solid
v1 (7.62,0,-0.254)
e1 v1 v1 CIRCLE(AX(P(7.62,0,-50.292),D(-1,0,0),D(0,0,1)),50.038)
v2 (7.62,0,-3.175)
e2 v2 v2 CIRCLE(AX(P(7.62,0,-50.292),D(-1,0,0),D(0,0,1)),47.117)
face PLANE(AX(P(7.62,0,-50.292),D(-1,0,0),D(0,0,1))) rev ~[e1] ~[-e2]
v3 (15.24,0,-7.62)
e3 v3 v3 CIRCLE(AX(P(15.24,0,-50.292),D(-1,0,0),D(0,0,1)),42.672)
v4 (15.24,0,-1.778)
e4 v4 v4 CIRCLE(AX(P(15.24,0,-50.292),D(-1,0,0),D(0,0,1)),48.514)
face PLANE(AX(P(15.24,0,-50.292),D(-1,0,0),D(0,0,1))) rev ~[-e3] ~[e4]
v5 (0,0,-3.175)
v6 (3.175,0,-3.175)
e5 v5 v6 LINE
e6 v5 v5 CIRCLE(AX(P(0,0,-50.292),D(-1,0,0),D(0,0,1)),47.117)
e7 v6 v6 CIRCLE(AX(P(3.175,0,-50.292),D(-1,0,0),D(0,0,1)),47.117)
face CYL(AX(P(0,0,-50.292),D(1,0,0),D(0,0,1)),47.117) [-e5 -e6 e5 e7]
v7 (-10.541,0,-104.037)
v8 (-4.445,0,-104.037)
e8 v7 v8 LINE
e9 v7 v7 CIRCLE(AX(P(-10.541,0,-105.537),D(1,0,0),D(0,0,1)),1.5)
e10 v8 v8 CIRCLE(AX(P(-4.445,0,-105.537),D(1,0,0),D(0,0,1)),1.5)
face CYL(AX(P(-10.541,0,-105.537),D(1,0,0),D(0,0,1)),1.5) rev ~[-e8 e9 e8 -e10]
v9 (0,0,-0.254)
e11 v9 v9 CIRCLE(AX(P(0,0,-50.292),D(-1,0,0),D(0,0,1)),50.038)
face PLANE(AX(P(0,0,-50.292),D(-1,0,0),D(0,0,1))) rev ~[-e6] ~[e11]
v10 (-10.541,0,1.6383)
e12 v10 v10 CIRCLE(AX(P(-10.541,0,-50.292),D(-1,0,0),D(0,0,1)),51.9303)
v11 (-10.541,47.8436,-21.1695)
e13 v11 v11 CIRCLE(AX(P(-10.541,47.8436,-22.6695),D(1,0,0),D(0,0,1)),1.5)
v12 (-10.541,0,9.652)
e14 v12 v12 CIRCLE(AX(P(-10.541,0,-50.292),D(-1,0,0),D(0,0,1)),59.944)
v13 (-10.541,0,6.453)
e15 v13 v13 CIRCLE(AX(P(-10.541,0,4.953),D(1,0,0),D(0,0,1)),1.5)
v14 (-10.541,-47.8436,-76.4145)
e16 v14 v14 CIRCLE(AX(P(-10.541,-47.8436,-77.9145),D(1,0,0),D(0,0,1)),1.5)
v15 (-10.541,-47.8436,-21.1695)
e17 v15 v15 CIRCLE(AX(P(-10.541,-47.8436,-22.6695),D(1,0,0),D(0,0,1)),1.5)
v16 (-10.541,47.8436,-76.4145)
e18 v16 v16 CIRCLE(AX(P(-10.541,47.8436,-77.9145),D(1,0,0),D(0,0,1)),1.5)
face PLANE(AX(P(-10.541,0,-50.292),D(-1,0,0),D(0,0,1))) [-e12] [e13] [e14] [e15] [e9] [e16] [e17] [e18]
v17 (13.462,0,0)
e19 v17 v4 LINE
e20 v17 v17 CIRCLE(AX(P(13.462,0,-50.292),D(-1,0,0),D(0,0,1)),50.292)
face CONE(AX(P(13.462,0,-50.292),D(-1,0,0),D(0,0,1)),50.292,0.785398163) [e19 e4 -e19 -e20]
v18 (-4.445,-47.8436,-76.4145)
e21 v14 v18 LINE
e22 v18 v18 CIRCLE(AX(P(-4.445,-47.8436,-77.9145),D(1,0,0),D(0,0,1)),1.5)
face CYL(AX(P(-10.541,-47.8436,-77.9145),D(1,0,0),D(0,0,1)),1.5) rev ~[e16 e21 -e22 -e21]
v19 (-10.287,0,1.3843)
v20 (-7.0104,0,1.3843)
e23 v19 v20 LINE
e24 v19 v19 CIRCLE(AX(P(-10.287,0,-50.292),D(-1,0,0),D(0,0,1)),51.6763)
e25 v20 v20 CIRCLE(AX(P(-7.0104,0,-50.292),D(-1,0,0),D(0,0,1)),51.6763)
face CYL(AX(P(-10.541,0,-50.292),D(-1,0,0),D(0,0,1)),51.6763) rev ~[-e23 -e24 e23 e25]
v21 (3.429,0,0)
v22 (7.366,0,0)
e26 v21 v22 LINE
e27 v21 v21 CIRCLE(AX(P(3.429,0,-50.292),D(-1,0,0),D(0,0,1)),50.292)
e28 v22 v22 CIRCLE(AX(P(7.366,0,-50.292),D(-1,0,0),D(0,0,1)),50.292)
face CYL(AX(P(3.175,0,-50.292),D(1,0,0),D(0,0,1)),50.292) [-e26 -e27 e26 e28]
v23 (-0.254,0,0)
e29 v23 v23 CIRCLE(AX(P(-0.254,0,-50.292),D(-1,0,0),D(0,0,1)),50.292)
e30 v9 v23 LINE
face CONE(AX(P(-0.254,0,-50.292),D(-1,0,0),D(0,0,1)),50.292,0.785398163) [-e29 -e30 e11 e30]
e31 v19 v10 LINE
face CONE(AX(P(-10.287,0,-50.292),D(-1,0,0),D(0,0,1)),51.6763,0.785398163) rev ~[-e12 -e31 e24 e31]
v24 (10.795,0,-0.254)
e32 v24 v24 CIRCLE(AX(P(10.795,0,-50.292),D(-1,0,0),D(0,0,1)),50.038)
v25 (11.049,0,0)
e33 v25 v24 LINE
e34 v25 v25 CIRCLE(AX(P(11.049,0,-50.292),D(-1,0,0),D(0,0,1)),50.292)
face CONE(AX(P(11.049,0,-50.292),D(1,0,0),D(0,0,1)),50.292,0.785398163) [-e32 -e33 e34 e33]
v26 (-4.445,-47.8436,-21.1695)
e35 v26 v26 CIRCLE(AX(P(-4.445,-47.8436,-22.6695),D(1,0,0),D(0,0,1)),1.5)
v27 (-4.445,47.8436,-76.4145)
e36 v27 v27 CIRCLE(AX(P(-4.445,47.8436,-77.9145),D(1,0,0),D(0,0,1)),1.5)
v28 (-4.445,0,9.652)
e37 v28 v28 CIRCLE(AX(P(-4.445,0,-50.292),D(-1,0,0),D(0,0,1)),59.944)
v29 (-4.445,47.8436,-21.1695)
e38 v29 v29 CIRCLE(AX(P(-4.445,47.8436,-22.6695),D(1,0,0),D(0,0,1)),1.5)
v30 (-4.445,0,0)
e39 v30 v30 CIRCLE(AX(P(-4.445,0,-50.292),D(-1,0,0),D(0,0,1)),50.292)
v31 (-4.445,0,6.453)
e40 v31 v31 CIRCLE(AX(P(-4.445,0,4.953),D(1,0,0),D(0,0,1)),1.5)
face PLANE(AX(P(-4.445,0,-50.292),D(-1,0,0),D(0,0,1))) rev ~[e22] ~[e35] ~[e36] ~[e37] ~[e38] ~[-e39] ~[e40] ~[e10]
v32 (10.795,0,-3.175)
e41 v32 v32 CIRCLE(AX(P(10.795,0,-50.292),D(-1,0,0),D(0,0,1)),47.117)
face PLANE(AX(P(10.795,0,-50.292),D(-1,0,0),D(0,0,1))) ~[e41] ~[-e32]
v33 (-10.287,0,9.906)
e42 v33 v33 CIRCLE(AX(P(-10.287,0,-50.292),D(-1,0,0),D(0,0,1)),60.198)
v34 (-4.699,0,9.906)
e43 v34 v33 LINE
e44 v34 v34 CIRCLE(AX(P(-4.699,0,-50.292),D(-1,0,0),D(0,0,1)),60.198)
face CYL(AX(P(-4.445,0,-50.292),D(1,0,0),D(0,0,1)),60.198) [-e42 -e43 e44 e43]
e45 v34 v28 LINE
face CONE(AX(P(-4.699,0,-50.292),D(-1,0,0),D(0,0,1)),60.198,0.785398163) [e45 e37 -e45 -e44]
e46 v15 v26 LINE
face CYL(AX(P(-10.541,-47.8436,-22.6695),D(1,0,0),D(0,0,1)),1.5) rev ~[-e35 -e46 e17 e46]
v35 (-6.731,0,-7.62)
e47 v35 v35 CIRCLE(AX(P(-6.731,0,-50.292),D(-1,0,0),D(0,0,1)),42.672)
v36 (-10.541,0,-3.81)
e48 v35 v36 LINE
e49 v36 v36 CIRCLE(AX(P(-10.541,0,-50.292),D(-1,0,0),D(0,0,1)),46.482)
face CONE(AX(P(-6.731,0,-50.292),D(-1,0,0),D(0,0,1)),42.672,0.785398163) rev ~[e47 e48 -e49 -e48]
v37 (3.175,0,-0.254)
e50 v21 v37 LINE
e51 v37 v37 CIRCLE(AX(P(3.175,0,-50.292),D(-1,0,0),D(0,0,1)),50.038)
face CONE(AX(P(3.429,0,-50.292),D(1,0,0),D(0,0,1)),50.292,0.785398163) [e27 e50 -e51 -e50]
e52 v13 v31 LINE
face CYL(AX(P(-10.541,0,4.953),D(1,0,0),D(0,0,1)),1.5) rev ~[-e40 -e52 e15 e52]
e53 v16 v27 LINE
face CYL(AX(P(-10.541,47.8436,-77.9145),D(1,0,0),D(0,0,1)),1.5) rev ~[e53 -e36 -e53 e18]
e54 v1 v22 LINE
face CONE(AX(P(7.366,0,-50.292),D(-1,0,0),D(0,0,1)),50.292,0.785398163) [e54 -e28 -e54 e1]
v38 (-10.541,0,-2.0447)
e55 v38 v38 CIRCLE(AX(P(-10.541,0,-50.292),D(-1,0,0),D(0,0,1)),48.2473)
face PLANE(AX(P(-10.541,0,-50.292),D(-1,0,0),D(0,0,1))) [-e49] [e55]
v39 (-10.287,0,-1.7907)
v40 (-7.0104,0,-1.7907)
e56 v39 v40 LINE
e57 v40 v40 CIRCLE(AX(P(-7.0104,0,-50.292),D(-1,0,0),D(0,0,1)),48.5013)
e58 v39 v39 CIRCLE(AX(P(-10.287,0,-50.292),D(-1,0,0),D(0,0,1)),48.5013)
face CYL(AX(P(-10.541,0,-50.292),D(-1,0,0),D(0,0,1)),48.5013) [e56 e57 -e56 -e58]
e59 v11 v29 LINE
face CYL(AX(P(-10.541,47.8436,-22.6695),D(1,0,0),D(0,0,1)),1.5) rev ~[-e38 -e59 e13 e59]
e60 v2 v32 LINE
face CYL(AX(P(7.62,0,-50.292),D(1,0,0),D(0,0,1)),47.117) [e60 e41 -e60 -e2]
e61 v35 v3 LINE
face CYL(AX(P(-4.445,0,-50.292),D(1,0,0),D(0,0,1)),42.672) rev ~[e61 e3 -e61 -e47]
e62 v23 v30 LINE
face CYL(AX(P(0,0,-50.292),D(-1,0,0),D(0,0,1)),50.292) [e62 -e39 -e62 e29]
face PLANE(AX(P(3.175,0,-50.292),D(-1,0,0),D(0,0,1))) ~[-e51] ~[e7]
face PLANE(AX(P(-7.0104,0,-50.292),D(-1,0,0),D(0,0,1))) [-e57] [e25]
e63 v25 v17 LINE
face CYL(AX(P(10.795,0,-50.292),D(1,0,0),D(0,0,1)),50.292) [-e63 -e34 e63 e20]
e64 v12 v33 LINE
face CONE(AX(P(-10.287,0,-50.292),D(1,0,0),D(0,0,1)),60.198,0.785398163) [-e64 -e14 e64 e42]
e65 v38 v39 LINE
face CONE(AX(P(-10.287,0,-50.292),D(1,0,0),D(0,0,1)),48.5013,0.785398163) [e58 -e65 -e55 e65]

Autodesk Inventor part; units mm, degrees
ref_plane "YZ Plane" through (0, 0, 0) normal (1, 0, 0) x (0, 1, 0)
ref_plane "XZ Plane" through (0, 0, 0) normal (0, 1, 0) x (-1, 0, 0)
ref_plane "XY Plane" through (0, 0, 0) normal (0, 0, 1) x (1, 0, 0)
sketch "Sketch1" plane through (0, 0, 0) normal (0, 1, 0) x (-1, 0, 0)
  line L0 (0, 0) -> (4.445, 0)
  line L1 (0, 0) -> (0, -3.175)
  line L2 (0, -3.175) -> (-3.175, -3.175)
  line L3 (-3.175, -3.175) -> (-3.175, 0)
  line L4 (-3.175, 0) -> (-7.62, 0)
  line L5 (-7.62, 0) -> (-7.62, -3.175)
  line L6 (-7.62, -3.175) -> (-10.795, -3.175)
  line L7 (-10.795, -3.175) -> (-10.795, 0)
  line L8 (-10.795, 0) -> (-15.24, 0)
  line L9 (-15.24, 0) -> (-15.24, -7.62)
  line L10 (-15.24, -7.62) -> (4.445, -7.62)
  line L11 (4.445, -7.62) -> (4.445, 0)
  line L12 (-15.24, 0) -> (-15.24, -50.292) construction
  line L13 (-15.24, -50.292) -> (-2.54, -50.292) construction
  dimension "d0" = 4.445
  dimension "d1" = 3.175
  dimension "d2" = 3.175
  dimension "d3" = 4.445
  dimension "d4" = 3.175
  dimension "d5" = 4.445
  dimension "d6" = 7.62
  dimension "d7" = 50.292
  dimension "d38" = 12.7
revolve "Revolution1" add sketch "Sketch1" angle 360 about axis through (15.24, 0, -50.292) along (-1, 0, 0)
sketch "Sketch2" plane through (-4.445, 0, -50.292) normal (-1, 0, 0) x (0, 0, 1)
  circle A0 centre (0, 0) radius 60.198
  circle A1 centre (0, 0) radius 42.672 projected
  dimension "d10" = 120.396
extrude "Extrusion1" add sketch "Sketch2" along normal blind 6.096
sketch "Sketch3" plane through (-10.541, 0, -50.292) normal (-1, 0, 0) x (0, 0, 1)
  circle A0 centre (0, 0) radius 48.5013
  circle A1 centre (0, 0) radius 51.6763
  circle A2 centre (0, 0) radius 42.672 construction
  dimension "d42" = 3.175
  dimension "d62" = 97.0026
extrude "Extrusion2" cut sketch "Sketch3" against normal blind 3.5306
chamfer "Chamfer1" distance 1.778 angle 45 1 edges at (15.24, 0, -100.584)
sketch "Sketch5" plane through (-10.541, 0, -50.292) normal (-1, 0, 0) x (0, 0, 1)
  circle A0 centre (0, 0) radius 55.245 construction
  circle A1 centre (0, 0) radius 42.672 projected
  circle A2 centre (0, 0) radius 48.5013 projected
  point P0 (-55.245, 0)
  point P1 (-27.6225, -47.8436)
  point P2 (27.6225, -47.8436)
  point P3 (55.245, 0)
  point P4 (27.6225, 47.8436)
  point P5 (-27.6225, 47.8436)
  dimension "d43" = 110.49
  dimension "d46" = 360
hole "Hole1" at (-10.541, 0, -105.537) at (-10.541, -47.8436, -77.9145) at (-10.541, -47.8436, -22.6695) at (-10.541, 0, 4.953) at (-10.541, 47.8436, -22.6695) at (-10.541, 47.8436, -77.9145) direction (1, 0, 0) diameter 3 end through all
chamfer "Chamfer2" distance 0.254 angle 45 8 edges at (0, 0, -100.584) (3.175, 0, -100.584) (7.62, 0, -100.584) (10.795, 0, -100.584) (-10.541, 0, -101.9683) (-10.541, 0, -98.7933) (-10.541, 0, -110.49) (-4.445, 0, -110.49)
sketch "Sketch8" plane through (-10.541, 0, -50.292) normal (-1, 0, 0) x (0, 0, 1)
  circle A0 centre (0, 0) radius 48.2473 projected
  point P0 (50.292, 0)
chamfer "Chamfer3" distance 3.81 angle 45 1 edges at (-10.541, 0, -92.964)
sketch "Sketch9" plane through (-10.541, 0, -50.292) normal (-1, 0, 0) x (0, 0, 1)
  point P0 (50.292, 0)
properties part number "Oring Fitting Dome V1 end part"
